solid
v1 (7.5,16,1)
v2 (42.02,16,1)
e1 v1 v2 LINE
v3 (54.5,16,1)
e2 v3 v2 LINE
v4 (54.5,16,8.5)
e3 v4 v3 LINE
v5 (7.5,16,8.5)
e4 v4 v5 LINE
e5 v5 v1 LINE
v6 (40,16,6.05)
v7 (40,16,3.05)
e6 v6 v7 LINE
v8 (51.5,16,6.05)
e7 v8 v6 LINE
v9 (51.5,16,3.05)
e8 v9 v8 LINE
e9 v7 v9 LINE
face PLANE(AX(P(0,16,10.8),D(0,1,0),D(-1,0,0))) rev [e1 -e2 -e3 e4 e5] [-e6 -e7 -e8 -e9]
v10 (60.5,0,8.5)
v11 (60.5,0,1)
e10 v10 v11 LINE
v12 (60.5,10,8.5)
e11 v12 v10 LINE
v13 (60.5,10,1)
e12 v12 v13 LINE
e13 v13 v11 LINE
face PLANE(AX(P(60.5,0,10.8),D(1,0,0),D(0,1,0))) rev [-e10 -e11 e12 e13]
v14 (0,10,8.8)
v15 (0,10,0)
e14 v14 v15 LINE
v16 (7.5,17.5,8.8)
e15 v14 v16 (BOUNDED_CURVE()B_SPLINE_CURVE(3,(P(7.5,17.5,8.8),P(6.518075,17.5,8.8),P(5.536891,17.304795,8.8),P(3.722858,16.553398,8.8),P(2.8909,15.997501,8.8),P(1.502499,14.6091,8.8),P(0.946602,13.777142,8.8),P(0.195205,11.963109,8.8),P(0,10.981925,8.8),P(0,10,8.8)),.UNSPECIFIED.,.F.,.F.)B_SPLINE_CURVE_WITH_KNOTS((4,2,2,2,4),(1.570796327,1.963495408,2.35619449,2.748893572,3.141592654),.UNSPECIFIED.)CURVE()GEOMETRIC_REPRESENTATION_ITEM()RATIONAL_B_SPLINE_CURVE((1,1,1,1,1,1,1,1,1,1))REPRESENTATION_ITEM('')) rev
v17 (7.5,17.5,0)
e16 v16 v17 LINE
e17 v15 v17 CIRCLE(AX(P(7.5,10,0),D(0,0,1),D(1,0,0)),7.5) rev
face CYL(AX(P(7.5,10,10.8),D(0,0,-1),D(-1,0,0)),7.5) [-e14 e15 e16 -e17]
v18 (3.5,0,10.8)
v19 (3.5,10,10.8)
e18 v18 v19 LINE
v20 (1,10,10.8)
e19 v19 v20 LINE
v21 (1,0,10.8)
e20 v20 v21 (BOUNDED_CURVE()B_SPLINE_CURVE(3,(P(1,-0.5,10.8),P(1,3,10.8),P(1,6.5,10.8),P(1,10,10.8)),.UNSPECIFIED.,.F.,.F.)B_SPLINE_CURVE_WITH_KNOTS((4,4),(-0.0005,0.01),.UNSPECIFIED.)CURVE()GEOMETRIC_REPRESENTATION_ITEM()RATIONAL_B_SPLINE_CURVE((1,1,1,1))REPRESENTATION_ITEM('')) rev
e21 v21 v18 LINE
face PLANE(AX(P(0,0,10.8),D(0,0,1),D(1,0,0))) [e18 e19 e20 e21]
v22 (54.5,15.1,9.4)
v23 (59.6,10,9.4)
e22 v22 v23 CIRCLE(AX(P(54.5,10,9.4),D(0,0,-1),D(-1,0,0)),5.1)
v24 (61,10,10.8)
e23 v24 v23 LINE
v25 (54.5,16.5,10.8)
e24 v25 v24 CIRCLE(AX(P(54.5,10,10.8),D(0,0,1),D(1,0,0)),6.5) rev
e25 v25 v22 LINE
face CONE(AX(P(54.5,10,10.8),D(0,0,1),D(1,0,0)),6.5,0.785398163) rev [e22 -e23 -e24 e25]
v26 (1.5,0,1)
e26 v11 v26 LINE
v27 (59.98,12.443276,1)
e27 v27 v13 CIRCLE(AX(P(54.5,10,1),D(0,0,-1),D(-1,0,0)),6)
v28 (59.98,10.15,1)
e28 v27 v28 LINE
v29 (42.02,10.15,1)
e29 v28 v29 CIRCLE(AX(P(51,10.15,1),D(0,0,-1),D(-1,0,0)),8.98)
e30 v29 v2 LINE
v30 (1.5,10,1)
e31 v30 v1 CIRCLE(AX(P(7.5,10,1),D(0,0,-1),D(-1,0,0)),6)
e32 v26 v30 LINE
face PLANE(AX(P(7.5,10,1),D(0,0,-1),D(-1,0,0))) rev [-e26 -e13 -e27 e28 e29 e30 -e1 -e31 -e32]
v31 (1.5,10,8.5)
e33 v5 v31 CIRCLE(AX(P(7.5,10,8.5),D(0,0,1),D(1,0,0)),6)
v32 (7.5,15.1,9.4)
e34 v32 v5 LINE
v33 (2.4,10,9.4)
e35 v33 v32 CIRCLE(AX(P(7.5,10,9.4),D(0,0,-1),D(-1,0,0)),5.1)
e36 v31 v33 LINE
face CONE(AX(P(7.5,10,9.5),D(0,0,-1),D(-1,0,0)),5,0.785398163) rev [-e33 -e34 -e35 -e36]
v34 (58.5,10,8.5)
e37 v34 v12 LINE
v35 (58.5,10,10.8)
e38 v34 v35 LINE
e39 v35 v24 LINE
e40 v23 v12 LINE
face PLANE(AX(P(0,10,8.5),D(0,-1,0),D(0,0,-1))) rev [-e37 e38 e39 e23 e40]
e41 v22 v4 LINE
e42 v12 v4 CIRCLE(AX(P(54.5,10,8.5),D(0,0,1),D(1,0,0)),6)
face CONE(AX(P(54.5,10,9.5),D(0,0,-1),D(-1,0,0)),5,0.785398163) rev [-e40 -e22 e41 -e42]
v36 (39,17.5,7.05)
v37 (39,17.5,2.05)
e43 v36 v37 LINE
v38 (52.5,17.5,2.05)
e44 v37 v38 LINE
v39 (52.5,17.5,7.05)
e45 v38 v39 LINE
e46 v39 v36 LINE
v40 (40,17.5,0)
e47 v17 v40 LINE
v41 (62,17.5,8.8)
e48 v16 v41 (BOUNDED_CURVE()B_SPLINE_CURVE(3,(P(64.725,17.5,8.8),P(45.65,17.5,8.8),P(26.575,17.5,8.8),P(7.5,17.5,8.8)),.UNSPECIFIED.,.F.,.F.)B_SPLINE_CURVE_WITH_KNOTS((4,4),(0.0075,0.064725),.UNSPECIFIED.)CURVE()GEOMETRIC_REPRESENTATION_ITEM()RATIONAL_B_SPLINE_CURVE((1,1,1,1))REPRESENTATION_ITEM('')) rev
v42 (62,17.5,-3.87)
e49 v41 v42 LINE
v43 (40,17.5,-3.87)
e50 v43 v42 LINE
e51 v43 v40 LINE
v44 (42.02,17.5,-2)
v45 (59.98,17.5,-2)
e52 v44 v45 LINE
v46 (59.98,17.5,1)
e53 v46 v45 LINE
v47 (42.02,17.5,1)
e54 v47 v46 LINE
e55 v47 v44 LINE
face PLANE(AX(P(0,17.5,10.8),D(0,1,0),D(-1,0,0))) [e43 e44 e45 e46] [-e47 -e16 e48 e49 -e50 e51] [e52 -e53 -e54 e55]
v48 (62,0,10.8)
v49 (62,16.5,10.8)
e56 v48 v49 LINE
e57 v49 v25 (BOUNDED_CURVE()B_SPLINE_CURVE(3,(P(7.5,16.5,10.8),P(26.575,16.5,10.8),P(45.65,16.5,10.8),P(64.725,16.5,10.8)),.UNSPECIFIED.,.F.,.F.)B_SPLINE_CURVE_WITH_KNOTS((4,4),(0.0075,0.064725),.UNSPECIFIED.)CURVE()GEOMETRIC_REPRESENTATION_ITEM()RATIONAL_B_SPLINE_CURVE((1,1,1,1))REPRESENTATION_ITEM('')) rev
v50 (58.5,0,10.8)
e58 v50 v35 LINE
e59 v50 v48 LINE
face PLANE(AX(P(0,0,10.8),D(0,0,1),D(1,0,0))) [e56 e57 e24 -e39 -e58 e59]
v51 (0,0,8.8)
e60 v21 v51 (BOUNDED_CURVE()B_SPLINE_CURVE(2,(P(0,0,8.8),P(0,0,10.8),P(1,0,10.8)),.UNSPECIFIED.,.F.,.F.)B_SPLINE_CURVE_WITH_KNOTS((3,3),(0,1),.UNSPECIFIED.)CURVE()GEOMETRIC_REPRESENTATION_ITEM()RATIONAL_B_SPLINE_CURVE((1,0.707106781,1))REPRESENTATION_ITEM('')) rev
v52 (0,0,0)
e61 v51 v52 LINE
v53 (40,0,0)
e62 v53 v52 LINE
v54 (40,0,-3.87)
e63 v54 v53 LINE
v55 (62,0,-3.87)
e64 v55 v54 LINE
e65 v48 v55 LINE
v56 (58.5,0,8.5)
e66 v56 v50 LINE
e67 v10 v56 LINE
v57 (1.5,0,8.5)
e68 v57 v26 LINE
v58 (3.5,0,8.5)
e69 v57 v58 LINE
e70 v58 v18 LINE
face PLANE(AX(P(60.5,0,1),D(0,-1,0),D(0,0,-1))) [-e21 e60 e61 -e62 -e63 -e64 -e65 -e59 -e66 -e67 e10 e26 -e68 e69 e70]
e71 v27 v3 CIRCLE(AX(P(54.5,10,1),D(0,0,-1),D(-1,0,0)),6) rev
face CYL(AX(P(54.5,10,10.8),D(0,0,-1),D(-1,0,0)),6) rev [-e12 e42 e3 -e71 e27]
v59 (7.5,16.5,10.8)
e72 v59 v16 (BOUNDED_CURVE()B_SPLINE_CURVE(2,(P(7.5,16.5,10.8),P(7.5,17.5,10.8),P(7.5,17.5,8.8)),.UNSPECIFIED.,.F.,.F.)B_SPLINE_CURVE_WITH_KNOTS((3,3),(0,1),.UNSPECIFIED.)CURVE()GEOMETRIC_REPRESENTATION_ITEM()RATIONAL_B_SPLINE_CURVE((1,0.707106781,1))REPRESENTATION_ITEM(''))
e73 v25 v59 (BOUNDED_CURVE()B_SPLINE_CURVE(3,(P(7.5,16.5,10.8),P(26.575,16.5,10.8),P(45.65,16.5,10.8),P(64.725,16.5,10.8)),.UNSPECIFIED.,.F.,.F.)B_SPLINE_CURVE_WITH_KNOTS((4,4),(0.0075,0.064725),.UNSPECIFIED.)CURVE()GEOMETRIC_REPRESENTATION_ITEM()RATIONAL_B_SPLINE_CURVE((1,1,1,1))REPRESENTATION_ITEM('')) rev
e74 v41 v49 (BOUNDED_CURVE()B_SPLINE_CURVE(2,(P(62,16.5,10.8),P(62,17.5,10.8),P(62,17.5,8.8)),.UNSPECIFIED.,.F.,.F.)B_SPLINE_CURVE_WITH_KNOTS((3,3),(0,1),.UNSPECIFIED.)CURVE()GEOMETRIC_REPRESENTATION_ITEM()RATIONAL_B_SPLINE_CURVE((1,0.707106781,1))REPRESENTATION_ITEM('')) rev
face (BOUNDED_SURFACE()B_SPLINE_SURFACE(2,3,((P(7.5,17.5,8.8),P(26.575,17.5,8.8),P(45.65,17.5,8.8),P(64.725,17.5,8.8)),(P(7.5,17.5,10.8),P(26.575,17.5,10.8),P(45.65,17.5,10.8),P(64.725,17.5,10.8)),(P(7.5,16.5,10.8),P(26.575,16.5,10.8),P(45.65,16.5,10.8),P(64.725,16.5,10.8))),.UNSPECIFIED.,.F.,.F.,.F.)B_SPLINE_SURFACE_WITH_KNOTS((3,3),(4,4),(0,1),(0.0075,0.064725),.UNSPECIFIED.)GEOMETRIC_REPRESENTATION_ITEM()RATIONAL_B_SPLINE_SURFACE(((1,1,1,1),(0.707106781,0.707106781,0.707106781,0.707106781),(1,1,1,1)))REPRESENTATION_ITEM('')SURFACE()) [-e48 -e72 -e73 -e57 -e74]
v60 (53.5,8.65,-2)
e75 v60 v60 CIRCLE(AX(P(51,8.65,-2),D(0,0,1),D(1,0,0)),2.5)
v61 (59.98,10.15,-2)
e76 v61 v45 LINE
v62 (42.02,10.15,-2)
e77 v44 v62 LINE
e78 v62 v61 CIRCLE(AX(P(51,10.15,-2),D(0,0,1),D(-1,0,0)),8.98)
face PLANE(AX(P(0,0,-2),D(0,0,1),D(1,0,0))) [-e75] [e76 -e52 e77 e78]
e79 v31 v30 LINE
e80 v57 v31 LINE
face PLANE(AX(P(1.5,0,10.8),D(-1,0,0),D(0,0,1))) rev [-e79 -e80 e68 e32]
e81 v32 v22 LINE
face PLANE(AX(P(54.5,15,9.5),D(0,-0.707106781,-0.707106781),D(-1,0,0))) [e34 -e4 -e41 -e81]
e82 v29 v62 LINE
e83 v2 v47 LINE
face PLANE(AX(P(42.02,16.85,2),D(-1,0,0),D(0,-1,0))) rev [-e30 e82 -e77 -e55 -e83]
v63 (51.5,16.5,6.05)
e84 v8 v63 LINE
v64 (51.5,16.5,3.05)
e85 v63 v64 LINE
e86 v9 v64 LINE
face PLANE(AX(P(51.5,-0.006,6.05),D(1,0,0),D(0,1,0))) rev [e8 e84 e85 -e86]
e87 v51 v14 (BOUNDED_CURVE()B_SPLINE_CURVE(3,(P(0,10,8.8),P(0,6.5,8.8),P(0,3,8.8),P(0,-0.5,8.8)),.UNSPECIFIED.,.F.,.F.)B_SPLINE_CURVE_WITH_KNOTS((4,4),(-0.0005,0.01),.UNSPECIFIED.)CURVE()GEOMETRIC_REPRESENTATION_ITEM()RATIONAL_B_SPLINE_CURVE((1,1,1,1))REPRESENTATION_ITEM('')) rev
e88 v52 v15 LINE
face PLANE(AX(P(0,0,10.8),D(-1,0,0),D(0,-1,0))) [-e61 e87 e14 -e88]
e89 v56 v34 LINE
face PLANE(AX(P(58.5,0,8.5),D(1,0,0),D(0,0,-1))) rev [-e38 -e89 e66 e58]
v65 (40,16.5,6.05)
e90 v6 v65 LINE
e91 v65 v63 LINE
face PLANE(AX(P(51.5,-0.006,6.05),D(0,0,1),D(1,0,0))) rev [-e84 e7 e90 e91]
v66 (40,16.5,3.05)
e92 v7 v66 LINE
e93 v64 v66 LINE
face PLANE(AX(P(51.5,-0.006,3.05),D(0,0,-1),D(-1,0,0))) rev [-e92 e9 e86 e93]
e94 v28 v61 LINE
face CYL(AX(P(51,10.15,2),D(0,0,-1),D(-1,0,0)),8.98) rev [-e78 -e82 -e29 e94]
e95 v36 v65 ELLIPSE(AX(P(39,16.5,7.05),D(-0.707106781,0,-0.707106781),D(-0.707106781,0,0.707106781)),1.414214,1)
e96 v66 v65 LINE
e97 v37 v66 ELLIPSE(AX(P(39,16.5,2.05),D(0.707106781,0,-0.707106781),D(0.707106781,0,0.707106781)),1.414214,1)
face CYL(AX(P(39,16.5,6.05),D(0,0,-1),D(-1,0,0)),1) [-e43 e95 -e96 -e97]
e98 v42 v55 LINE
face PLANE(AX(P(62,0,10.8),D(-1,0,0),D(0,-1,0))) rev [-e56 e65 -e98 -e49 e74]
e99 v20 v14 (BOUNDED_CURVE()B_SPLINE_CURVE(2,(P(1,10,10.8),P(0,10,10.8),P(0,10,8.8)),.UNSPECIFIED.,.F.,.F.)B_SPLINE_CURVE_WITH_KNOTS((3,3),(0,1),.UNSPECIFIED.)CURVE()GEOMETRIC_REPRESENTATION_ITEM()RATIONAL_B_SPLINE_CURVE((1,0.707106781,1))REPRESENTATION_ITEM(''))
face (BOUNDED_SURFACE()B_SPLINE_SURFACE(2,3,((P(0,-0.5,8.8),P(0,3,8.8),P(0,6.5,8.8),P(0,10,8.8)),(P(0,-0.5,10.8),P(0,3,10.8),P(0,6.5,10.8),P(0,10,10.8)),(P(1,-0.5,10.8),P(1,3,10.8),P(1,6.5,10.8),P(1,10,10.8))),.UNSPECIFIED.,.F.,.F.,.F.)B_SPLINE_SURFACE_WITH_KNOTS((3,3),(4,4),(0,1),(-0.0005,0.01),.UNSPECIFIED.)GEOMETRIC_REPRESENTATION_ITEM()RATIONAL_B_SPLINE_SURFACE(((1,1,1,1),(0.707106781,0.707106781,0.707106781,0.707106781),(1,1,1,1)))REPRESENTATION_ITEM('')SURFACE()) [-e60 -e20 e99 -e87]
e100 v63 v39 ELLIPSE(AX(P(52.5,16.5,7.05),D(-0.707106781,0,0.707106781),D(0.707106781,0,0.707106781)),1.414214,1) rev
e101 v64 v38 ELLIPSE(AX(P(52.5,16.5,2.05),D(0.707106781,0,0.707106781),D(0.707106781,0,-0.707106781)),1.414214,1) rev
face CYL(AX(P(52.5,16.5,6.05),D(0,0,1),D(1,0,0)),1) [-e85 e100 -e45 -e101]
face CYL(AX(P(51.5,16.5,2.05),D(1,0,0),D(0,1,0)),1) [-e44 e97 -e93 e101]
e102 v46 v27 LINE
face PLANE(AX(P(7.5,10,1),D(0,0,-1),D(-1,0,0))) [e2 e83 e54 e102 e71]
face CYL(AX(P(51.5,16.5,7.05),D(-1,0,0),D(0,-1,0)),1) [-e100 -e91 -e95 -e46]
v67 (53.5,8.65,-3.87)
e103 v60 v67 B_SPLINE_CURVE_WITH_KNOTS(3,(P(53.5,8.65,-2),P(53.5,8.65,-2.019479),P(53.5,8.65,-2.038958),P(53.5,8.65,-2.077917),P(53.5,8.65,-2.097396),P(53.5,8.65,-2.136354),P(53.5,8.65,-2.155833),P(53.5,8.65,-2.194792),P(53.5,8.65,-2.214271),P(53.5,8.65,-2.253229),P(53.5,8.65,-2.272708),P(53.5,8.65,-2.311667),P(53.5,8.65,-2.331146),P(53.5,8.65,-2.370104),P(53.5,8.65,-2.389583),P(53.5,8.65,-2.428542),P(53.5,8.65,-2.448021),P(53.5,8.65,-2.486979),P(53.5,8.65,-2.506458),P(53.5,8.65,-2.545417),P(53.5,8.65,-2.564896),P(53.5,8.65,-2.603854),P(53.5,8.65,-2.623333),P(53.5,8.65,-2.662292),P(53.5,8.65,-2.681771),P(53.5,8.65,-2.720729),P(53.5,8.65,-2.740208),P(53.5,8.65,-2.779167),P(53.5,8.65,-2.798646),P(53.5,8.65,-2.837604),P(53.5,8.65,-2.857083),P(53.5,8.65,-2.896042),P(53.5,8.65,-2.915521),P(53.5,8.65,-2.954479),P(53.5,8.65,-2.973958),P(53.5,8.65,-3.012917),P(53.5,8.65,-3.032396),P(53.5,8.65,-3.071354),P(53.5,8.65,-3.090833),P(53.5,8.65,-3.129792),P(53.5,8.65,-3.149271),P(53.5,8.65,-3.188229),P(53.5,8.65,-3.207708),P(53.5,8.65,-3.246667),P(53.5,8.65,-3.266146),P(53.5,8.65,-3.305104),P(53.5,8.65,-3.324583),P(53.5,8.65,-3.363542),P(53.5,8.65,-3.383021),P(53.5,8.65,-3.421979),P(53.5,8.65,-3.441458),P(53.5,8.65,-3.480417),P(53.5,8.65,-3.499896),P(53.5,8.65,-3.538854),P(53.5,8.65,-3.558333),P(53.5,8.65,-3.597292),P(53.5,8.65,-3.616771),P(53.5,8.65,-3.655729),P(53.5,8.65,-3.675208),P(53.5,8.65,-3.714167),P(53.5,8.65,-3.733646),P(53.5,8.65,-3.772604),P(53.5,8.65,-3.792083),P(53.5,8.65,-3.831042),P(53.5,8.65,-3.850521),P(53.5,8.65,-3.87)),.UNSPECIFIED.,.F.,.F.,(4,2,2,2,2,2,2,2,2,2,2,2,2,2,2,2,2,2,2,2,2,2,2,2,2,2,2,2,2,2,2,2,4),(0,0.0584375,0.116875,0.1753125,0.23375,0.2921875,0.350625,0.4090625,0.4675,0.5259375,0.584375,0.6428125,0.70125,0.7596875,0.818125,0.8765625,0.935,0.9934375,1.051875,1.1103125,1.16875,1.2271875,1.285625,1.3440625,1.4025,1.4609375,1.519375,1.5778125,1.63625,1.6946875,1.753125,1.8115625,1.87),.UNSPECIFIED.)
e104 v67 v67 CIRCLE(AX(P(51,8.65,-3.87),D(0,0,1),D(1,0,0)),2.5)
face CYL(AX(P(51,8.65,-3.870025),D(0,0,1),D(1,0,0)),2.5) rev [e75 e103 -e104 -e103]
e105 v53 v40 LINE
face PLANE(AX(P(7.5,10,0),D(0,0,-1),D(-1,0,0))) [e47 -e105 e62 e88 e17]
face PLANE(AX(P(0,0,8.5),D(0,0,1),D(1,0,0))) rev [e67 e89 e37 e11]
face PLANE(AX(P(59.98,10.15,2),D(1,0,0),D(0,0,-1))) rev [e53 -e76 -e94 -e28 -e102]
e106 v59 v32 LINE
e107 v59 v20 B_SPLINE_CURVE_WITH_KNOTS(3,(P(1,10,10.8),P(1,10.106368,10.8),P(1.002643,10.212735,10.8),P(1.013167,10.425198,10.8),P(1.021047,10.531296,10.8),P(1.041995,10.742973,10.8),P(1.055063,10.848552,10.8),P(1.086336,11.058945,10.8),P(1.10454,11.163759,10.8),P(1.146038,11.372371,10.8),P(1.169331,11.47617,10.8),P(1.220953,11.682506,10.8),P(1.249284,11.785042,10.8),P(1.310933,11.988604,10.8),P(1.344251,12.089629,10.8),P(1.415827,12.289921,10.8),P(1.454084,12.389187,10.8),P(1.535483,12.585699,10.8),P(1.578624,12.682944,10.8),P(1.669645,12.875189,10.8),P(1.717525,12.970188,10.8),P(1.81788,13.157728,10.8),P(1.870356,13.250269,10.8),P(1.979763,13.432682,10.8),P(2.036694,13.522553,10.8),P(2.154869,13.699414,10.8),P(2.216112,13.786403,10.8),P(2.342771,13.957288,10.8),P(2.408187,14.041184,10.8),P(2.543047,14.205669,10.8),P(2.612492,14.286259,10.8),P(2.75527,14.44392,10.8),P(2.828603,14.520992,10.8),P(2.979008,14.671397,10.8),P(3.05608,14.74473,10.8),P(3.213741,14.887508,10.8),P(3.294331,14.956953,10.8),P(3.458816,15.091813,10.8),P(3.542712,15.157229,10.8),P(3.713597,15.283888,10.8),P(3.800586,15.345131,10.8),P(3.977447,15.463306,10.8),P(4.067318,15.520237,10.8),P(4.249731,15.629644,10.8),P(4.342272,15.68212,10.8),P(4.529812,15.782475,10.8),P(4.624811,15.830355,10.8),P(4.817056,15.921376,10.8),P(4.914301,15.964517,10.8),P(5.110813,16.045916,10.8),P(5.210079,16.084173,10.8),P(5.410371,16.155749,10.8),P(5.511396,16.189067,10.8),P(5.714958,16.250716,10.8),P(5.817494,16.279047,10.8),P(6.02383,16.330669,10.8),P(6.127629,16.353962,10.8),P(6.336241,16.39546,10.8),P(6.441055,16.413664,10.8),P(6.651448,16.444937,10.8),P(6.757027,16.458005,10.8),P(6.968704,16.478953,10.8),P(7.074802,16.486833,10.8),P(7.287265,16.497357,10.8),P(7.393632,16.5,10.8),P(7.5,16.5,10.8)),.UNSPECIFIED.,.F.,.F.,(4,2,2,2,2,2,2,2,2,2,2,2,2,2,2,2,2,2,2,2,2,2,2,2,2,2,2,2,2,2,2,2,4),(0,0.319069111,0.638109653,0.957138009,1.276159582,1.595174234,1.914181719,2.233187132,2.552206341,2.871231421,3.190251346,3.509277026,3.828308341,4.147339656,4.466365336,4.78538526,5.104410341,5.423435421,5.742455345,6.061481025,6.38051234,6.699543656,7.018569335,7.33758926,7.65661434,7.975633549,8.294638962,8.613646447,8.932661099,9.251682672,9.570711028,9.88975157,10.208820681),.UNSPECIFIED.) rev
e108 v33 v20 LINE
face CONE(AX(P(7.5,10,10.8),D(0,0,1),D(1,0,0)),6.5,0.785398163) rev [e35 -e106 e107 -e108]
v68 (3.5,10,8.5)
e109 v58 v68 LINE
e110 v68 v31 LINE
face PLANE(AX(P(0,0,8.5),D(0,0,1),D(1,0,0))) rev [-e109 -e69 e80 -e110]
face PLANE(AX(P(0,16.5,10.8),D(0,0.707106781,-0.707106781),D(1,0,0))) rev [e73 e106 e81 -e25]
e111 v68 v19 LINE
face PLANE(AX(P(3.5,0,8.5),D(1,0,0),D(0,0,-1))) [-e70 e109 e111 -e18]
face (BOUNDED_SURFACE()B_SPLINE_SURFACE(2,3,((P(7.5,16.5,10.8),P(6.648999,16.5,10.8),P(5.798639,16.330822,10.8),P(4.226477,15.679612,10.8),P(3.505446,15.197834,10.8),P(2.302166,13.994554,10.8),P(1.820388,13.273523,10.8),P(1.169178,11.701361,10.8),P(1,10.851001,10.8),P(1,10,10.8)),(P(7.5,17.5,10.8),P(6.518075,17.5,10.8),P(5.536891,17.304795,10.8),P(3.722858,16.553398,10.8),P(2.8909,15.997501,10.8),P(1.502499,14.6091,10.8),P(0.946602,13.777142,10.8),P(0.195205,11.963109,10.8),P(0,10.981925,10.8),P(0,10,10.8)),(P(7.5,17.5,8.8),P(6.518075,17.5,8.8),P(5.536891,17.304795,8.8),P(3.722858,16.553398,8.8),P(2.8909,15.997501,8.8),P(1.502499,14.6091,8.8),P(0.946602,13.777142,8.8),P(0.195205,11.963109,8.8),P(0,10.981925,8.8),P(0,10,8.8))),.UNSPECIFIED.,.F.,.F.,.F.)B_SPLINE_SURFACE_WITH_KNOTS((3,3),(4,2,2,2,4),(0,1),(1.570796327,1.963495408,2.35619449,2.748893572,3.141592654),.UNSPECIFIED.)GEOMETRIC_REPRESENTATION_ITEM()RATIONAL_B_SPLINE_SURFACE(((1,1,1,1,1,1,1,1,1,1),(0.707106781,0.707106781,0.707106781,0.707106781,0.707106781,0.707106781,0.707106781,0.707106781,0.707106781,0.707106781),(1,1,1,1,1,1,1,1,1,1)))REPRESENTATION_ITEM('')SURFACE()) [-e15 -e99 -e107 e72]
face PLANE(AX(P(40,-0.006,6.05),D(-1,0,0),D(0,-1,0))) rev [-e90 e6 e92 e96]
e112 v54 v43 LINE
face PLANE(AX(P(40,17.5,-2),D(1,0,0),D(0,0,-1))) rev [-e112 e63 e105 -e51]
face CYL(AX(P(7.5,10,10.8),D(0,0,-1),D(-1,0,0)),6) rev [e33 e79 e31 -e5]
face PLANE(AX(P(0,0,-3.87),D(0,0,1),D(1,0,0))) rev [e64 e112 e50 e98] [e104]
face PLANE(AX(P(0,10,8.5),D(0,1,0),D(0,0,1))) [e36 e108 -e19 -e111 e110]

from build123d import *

# Parameters (mm, degrees)
BOSS_EXTRUDE1_DEPTH  = 10.8
BOSS_EXTRUDE2_DEPTH  = 1
SKETCH3_W            = 2
SKETCH3_H            = 10
BOSS_EXTRUDE3_DEPTH  = 2.3
FILLET1_SIZE         = 2
FILLET1_SIZE_2       = 1
CUT_EXTRUDE1_REACH   = 67.321
SKETCH4_W            = 11.5
SKETCH4_H            = 3
BOSS_EXTRUDE4_DEPTH  = 2.3
CHAMFER1_SIZE        = 1.5
CUT_EXTRUDE2_DEPTH   = 2
BOSS_EXTRUDE6_DEPTH  = 2
FILLET2_R            = 1
BOSS_EXTRUDE36_DEPTH = 1
BOSS_EXTRUDE7_DEPTH  = 1.87
SKETCH11_R           = 2.5
CUT_EXTRUDE3_DEPTH   = 66.681732761


with BuildPart() as part:
    # Sketch1 → Boss-Extrude1 (new body)
    with BuildSketch(Plane.XY):
        with BuildLine():
            ThreePointArc((7.5, 17.5), (2.196699141, 15.303300859), (0, 10))
            Line((0, 10), (0, 0))
            Line((0, 0), (1.5, 0))
            Line((1.5, 0), (1.5, 10))
            ThreePointArc((1.5, 10), (3.257359313, 14.242640687), (7.5, 16))
            Line((7.5, 16), (54.5, 16))
            ThreePointArc((54.5, 16), (58.742640687, 14.242640687), (60.5, 10))
            Line((60.5, 10), (60.5, 0))
            Line((60.5, 0), (62, 0))
            Line((62, 0), (62, 17.5))
            Line((62, 17.5), (7.5, 17.5))
        make_face()
    extrude(amount=BOSS_EXTRUDE1_DEPTH)


with BuildPart() as body_2:
    # Sketch2 → Boss-Extrude2 (new body)
    with BuildSketch(Plane(origin=(0, 0, 0), x_dir=(-1, 0, 0), z_dir=(0, 0, -1))):
        with BuildLine():
            Line((-1.5, 0), (-1.5, 10))
            ThreePointArc((-1.5, 10), (-3.257359313, 14.242640687), (-7.5, 16))
            Line((-7.5, 16), (-54.5, 16))
            ThreePointArc((-54.5, 16), (-58.742640687, 14.242640687), (-60.5, 10))
            Line((-60.5, 10), (-60.5, 0))
            Line((-60.5, 0), (-1.5, 0))
        make_face()
    extrude(amount=-BOSS_EXTRUDE2_DEPTH)

    # Combine1: union part
    add(part.part)

    # Sketch3 → Boss-Extrude3 (add)
    with BuildSketch(Plane.XY.offset(10.8)):
        with Locations((2.5, 5)):
            Rectangle(SKETCH3_W, SKETCH3_H)
        with Locations((59.5, 5)):
            Rectangle(SKETCH3_W, SKETCH3_H)
    extrude(amount=-BOSS_EXTRUDE3_DEPTH)

    # Fillet1
    # a fillet whose section is not a circle: 2, 1 mm, written as the material it takes off along each edge
    with BuildSketch(Plane(origin=(0, 10, 10.8), x_dir=(0, 0, -1), z_dir=(0, -1, 0))) as fillet1_piece_1:
        with BuildLine():
            Bezier((FILLET1_SIZE, 0), (0, 0), (0, FILLET1_SIZE_2), weights=[1, 0.707106781, 1])
            Line((0, FILLET1_SIZE_2), (0, 0))
            Line((0, 0), (FILLET1_SIZE, 0))
        make_face()
    extrude(amount=15, mode=Mode.SUBTRACT)
    with BuildSketch(Plane(origin=(7.5, 10, 10.8), x_dir=(0, 1, 0), z_dir=(1, 0, 0))) as fillet1_piece_2:
        with BuildLine():
            Bezier((7.5, -FILLET1_SIZE), (7.5, 0), (7.5 - FILLET1_SIZE_2, 0), weights=[1, 0.707106781, 1])
            Line((7.5 - FILLET1_SIZE_2, 0), (7.5, 0))
            Line((7.5, 0), (7.5, -FILLET1_SIZE))
        make_face()
    revolve(axis=Axis((7.5, 10, 10.8), (0, 0, 1)), revolution_arc=90, mode=Mode.SUBTRACT)
    with BuildSketch(Plane(origin=(67, 17.5, 10.8), x_dir=(0, 0, -1), z_dir=(-1, 0, 0))) as fillet1_piece_3:
        with BuildLine():
            Bezier((FILLET1_SIZE, 0), (0, 0), (0, FILLET1_SIZE_2), weights=[1, 0.707106781, 1])
            Line((0, FILLET1_SIZE_2), (0, 0))
            Line((0, 0), (FILLET1_SIZE, 0))
        make_face()
    extrude(amount=59.5, mode=Mode.SUBTRACT)

    # Sketch4 → Cut-Extrude1 (cut, up to next)
    with BuildSketch(Plane(origin=(0, 17.5, 0), x_dir=(1, 0, 0), z_dir=(0, 1, 0)), mode=Mode.PRIVATE) as cut_extrude1_sk1:
        with Locations((45.75, -4.55)):
            Rectangle(SKETCH4_W, SKETCH4_H)
    cut_extrude1_tool1 = extrude(cut_extrude1_sk1.sketch, amount=-CUT_EXTRUDE1_REACH, mode=Mode.PRIVATE) & body_2.part
    add(cut_extrude1_tool1.solids().sort_by_distance((45.75, 17.5, 4.55))[0], mode=Mode.SUBTRACT)

    # Sketch5 → Boss-Extrude4 (add)
    with BuildSketch(Plane.XY.offset(10.8)):
        with BuildLine():
            Line((60.5, 10), (59.5, 10))
            ThreePointArc((59.5, 10), (58.035533906, 13.535533906), (54.5, 15))
            Line((54.5, 15), (7.5, 15))
            ThreePointArc((7.5, 15), (3.964466094, 13.535533906), (2.5, 10))
            Line((2.5, 10), (1.5, 10))
            ThreePointArc((1.5, 10), (3.257359313, 14.242640687), (7.5, 16))
            Line((7.5, 16), (54.5, 16))
            ThreePointArc((54.5, 16), (58.742640687, 14.242640687), (60.5, 10))
        make_face()
    extrude(amount=-BOSS_EXTRUDE4_DEPTH)

    # Chamfer1
    chamfer1_edges = [body_2.edges().sort_by_distance(p)[0] for p in [
        (58.035533906, 13.535533906, 10.8),
        (3.964466094, 13.535533906, 10.8),
        (31, 15, 10.8),
    ]]
    chamfer(chamfer1_edges, length=CHAMFER1_SIZE - 0.0001)  # a hair under: the kernel refuses the full size

    # Chamfer3: read off the stored shape, not the designer's step
    # Chamfer3: loft between two sections, ruled curve by curve
    chamfer3_from = [
        Edge.make_three_point_arc((2.4, 10, 9.4), (3.893755416, 13.606244584, 9.4), (7.5, 15.1, 9.4)),
        Edge.make_three_point_arc((54.5, 15.1, 9.4), (58.106244584, 13.606244584, 9.4), (59.6, 10, 9.4)),
        Edge.make_line((7.5, 15.1, 9.4), (54.5, 15.1, 9.4)),
        Edge.make_line((59.6, 10, 9.4), (2.4, 10, 9.4)),
    ]
    chamfer3_to = [
        Edge.make_three_point_arc((1.5, 10, 8.5), (3.257359313, 14.242640687, 8.5), (7.5, 16, 8.5)),
        Edge.make_three_point_arc((54.5, 16, 8.5), (58.742640687, 14.242640687, 8.5), (60.5, 10, 8.5)),
        Edge.make_line((7.5, 16, 8.5), (54.5, 16, 8.5)),
        Edge.make_line((60.5, 10, 8.5), (1.5, 10, 8.5)),
    ]
    chamfer3 = Solid(Shell([*[Face.make_surface_from_curves(chamfer3_from[k], chamfer3_to[k]) for k in range(4)], Face(Wire(chamfer3_from)), Face(Wire(chamfer3_to))]))
    add(chamfer3, mode=Mode.SUBTRACT)

    # Sketch6 → Cut-Extrude2 (cut)
    with BuildSketch(Plane(origin=(0, 0, 0), x_dir=(-1, 0, 0), z_dir=(0, 0, -1))):
        with BuildLine():
            Line((-59.98, 10.15), (-59.98, 16.85))
            Line((-59.98, 16.85), (-59.98, 17.5))
            Line((-59.98, 17.5), (-42.02, 17.5))
            Line((-42.02, 17.5), (-42.02, 16.85))
            Line((-42.02, 16.85), (-42.02, 10.15))
            ThreePointArc((-42.02, 10.15), (-51, 1.17), (-59.98, 10.15))
        make_face()
    extrude(amount=-CUT_EXTRUDE2_DEPTH, mode=Mode.SUBTRACT)

    # Sketch9 → Boss-Extrude6 (add)
    with BuildSketch(Plane(origin=(0, 0, 0), x_dir=(-1, 0, 0), z_dir=(0, 0, -1))):
        with BuildLine():
            Line((-54.5, 0), (-62, 0))
            Line((-62, 0), (-62, 6.85))
            Line((-62, 6.85), (-62, 17.5))
            Line((-62, 17.5), (-59.98, 17.5))
            Line((-59.98, 17.5), (-59.98, 10.15))
            ThreePointArc((-59.98, 10.15), (-51, 1.17), (-42.02, 10.15))
            Line((-42.02, 10.15), (-42.02, 17.5))
            Line((-42.02, 17.5), (-40, 17.5))
            Line((-40, 17.5), (-40, 6.854472052))
            Line((-40, 6.854472052), (-40, 0))
            Line((-40, 0), (-47.292116273, 0))
            Line((-47.292116273, 0), (-54.5, 0))
        make_face()
    extrude(amount=BOSS_EXTRUDE6_DEPTH)

    # Fillet2
    fillet2_edges = [body_2.edges().sort_by_distance(p)[0] for p in [
        (51.5, 17.5, 4.55),
        (45.75, 17.5, 3.05),
        (40, 17.5, 4.55),
        (45.75, 17.5, 6.05),
    ]]
    fillet(fillet2_edges, radius=FILLET2_R)

    # Sketch48 → Boss-Extrude36 (add)
    with BuildSketch(Plane(origin=(0, 0, 2), x_dir=(-1, 0, 0), z_dir=(0, 0, -1))):
        with BuildLine():
            Line((-54.5, 16), (-42.02, 16))
            Line((-42.02, 16), (-42.02, 17.5))
            Line((-42.02, 17.5), (-59.98, 17.5))
            Line((-59.98, 17.5), (-59.98, 12.443276489))
            ThreePointArc((-59.98, 12.443276489), (-57.766522698, 15.032874871), (-54.5, 16))
        make_face()
    extrude(amount=BOSS_EXTRUDE36_DEPTH)

    # Sketch10 → Boss-Extrude7 (add)
    with BuildSketch(Plane(origin=(0, 0, -2), x_dir=(-1, 0, 0), z_dir=(0, 0, -1))):
        Polygon((-54.5, 0), (-62, 0), (-62, 3.4), (-62, 17.5), (-40, 17.5), (-40, 6.854472052), (-40, 0), (-47.292116273, 0), align=None)
    extrude(amount=BOSS_EXTRUDE7_DEPTH)

    # Sketch11 → Cut-Extrude3 (cut, through all)
    with BuildSketch(Plane.XY.offset(-2)):
        with Locations((51, 8.65)):
            Circle(SKETCH11_R)
    extrude(amount=-CUT_EXTRUDE3_DEPTH, mode=Mode.SUBTRACT)


solid = body_2.part
